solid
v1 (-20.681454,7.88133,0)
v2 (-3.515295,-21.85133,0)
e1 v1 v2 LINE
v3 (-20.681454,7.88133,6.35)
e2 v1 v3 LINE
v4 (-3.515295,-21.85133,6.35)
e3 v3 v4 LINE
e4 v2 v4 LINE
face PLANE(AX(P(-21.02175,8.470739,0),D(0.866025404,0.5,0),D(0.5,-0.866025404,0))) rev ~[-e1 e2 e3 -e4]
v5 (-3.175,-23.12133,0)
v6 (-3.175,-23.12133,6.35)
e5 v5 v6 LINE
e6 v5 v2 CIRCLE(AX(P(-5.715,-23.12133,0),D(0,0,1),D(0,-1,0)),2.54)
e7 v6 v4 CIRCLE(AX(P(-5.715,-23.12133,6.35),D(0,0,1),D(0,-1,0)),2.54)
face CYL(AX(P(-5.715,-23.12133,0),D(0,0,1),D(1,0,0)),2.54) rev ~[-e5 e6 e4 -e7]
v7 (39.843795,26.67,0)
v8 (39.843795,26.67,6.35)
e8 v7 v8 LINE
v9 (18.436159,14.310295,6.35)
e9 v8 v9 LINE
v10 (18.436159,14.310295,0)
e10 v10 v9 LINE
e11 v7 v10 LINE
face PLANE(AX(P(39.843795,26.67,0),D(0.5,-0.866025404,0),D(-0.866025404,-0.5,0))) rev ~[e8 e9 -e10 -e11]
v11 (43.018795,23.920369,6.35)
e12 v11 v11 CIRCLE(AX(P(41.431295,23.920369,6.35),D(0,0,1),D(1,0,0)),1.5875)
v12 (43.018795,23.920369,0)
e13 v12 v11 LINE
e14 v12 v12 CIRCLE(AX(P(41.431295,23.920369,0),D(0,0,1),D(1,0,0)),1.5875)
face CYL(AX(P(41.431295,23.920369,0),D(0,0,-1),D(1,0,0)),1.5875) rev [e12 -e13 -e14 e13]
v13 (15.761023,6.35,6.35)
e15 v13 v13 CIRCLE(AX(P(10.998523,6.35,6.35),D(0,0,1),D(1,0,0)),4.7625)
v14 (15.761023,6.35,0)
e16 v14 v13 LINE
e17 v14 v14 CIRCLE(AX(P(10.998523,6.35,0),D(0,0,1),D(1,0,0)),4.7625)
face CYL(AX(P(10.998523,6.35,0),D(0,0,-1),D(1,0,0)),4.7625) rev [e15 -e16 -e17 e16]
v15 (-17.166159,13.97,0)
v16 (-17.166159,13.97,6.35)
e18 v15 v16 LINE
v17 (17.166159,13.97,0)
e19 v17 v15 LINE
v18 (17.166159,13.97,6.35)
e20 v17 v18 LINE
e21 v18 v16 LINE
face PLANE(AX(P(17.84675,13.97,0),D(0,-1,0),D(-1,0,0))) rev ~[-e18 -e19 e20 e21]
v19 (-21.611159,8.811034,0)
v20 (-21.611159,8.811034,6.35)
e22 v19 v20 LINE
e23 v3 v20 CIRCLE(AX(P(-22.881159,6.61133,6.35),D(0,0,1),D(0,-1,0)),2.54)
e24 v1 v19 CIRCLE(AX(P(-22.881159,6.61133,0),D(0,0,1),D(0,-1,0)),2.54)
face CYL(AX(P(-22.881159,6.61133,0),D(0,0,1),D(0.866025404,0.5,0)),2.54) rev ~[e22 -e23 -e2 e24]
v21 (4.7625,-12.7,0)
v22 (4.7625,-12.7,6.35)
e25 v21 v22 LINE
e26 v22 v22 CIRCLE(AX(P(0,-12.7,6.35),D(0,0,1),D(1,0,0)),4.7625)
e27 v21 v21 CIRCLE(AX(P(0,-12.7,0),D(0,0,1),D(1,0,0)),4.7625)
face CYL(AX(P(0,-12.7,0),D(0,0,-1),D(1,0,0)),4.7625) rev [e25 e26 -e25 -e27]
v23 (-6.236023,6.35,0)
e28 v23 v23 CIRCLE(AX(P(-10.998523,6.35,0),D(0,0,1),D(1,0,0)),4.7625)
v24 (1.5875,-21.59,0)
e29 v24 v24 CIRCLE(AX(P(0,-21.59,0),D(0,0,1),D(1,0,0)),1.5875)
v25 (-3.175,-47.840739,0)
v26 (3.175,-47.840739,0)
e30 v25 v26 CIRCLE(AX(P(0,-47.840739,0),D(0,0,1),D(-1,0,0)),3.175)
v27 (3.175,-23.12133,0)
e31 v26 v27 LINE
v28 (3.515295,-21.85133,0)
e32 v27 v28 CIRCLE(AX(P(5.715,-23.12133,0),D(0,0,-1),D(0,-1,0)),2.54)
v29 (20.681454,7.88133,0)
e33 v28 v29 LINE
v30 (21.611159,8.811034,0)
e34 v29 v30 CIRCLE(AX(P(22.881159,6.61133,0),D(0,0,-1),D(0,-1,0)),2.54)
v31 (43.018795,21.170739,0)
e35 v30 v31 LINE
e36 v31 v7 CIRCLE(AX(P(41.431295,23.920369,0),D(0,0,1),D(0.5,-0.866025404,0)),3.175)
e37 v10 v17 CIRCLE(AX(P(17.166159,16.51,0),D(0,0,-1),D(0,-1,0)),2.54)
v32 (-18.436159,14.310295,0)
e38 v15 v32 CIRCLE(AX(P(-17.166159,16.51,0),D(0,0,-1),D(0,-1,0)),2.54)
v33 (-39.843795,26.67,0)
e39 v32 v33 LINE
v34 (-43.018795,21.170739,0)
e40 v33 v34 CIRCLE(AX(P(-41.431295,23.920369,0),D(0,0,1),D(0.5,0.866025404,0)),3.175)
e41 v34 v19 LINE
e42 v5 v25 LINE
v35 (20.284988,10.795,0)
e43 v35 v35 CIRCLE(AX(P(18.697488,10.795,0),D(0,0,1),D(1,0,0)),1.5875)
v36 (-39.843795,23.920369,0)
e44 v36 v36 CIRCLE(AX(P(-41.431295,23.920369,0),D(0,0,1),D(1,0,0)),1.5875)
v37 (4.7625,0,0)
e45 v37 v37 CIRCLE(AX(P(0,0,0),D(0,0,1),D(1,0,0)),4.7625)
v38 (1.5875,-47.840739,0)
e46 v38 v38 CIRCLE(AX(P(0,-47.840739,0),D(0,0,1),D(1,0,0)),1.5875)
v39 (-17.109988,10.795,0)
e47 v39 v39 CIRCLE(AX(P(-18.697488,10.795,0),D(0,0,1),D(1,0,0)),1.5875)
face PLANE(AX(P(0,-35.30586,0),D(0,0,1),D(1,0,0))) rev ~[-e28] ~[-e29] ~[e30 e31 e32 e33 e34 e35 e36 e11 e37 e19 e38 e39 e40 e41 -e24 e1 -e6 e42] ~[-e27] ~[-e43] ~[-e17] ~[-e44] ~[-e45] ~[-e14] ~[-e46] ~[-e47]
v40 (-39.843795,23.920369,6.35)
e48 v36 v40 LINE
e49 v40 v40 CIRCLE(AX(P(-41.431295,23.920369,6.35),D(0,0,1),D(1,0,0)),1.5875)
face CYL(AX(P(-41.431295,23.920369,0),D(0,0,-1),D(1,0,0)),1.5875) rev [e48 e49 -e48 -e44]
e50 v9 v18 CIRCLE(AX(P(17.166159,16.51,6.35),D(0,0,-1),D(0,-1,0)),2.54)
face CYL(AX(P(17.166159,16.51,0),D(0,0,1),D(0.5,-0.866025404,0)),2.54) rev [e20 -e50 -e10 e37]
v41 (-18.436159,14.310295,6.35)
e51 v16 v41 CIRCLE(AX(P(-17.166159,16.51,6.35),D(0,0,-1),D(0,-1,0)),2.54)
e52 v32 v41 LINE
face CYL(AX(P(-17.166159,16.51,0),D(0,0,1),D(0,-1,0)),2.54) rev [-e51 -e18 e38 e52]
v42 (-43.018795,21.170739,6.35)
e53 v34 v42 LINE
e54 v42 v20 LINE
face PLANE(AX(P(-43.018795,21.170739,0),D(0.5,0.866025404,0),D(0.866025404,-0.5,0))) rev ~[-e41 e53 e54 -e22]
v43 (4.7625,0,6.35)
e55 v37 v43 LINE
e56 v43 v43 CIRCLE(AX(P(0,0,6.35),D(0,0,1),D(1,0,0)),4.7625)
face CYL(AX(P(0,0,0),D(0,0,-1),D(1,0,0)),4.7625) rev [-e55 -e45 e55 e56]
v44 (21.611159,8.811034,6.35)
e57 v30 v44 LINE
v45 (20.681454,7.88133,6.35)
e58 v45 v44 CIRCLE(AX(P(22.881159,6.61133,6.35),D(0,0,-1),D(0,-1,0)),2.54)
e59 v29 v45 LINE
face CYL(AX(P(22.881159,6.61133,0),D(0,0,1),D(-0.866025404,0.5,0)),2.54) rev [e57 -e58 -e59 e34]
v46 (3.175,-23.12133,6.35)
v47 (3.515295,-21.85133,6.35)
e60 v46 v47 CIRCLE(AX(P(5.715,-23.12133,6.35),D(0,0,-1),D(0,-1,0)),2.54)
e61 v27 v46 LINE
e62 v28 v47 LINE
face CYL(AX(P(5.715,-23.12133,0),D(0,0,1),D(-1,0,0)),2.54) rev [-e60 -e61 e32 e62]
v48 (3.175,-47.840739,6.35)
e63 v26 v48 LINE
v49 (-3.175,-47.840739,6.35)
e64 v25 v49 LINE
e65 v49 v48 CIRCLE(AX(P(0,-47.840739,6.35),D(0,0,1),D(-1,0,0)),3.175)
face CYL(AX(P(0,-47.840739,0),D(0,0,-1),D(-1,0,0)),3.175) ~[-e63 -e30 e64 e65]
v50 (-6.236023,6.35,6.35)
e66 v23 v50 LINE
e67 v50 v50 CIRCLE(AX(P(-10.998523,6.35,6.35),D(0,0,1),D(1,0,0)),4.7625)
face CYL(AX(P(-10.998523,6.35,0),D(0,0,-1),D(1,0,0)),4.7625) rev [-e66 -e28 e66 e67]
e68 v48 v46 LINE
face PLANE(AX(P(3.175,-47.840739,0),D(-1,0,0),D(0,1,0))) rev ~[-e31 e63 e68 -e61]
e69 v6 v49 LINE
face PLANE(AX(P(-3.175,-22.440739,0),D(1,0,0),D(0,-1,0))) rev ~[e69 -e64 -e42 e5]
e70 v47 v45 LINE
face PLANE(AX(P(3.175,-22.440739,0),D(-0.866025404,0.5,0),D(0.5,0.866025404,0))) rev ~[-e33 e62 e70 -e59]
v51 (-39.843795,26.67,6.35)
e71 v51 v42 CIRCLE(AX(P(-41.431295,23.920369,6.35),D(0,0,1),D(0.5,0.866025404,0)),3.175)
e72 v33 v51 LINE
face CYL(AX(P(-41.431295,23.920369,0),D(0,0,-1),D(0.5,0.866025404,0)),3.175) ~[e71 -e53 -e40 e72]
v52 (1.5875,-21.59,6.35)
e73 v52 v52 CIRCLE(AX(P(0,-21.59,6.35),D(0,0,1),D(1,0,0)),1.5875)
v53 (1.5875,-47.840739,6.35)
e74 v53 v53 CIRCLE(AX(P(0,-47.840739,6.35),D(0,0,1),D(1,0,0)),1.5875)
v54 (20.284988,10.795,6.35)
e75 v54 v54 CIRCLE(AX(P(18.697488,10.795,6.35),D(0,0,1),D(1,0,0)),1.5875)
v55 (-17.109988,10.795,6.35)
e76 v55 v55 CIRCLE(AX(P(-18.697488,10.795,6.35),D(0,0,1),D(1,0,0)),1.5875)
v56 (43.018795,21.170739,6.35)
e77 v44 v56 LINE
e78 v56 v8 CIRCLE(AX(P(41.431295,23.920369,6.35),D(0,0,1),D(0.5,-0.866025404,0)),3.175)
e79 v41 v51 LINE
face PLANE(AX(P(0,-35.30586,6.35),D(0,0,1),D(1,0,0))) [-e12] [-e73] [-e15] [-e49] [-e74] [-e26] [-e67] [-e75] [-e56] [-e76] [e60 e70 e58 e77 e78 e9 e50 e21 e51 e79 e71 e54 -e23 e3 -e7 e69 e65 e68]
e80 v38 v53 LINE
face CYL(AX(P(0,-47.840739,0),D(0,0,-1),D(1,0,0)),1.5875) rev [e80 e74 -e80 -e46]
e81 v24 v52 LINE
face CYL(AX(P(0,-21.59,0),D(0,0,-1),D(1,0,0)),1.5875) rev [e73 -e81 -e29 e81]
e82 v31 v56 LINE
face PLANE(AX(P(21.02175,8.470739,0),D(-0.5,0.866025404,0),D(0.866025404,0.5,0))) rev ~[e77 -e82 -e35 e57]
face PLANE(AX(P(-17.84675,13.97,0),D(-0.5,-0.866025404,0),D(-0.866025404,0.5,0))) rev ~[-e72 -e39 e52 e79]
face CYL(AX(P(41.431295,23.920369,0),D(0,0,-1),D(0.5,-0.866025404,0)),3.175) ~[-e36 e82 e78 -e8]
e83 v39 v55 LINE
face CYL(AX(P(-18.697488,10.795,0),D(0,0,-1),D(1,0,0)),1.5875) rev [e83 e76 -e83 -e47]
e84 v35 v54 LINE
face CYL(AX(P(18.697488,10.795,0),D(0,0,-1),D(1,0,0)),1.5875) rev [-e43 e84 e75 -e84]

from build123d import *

# Parameters (mm, degrees)
F0_R     = 1.5875
F0_R_2   = 4.7625
F1_DEPTH = 6.35
F2_R     = 2.54


# Not quite as in the source:
# - a length typed as a fraction of an inch, garbled in the dataset ("3 / 203.2 mm" for 3/8 in), is restored


with BuildPart() as f1:
    # F0 (on Top) → F1 (new body)
    with BuildSketch(Plane.XY):
        with BuildLine():
            Line((3.175, -22.440738686), (0, -27.94))
            Line((0, -27.94), (-3.175, -22.440738686))
            Line((-3.175, -22.440738686), (-3.175, -47.840738686))
            ThreePointArc((-3.175, -47.840738686), (0, -51.015738686), (3.175, -47.840738686))
            Line((3.175, -47.840738686), (3.175, -22.440738686))
        make_face()
        with Locations((0, -47.840738686)):
            Circle(F0_R, mode=Mode.SUBTRACT)
        Polygon((-3.175, -22.440738686), (0, -27.94), (3.175, -22.440738686), (21.0217497817, 8.470738686), (24.1967497817, 13.97), (17.8467497817, 13.97), (-17.8467497817, 13.97), (-24.1967497817, 13.97), (-21.0217497817, 8.470738686), align=None)
        with Locations((0, -21.59)):
            Circle(F0_R, mode=Mode.SUBTRACT)
        with Locations((0, -12.7)):
            Circle(F0_R_2, mode=Mode.SUBTRACT)
        Circle(F0_R_2, mode=Mode.SUBTRACT)
        with Locations((-10.9985226281, 6.35)):
            Circle(F0_R_2, mode=Mode.SUBTRACT)
        with Locations((-18.6974884677, 10.795)):
            Circle(F0_R, mode=Mode.SUBTRACT)
        with Locations((10.9985226281, 6.35)):
            Circle(F0_R_2, mode=Mode.SUBTRACT)
        with Locations((18.6974884677, 10.795)):
            Circle(F0_R, mode=Mode.SUBTRACT)
        with BuildLine():
            Line((-43.0187950379, 21.170738686), (-21.0217497817, 8.470738686))
            Line((-21.0217497817, 8.470738686), (-24.1967497817, 13.97))
            Line((-24.1967497817, 13.97), (-17.8467497817, 13.97))
            Line((-17.8467497817, 13.97), (-39.8437950379, 26.67))
            ThreePointArc((-39.8437950379, 26.67), (-44.1809256949, 25.507869343), (-43.0187950379, 21.170738686))
        make_face()
        with Locations((-41.4312950379, 23.920369343)):
            Circle(F0_R, mode=Mode.SUBTRACT)
        with BuildLine():
            Line((24.1967497817, 13.97), (21.0217497817, 8.470738686))
            Line((21.0217497817, 8.470738686), (43.0187950379, 21.170738686))
            ThreePointArc((43.0187950379, 21.170738686), (44.1809256949, 25.507869343), (39.8437950379, 26.67))
            Line((39.8437950379, 26.67), (17.8467497817, 13.97))
            Line((17.8467497817, 13.97), (24.1967497817, 13.97))
        make_face()
        with Locations((41.4312950379, 23.920369343)):
            Circle(F0_R, mode=Mode.SUBTRACT)
    extrude(amount=F1_DEPTH)

    # F2
    f2_edges = [f1.edges().sort_by_distance(p)[0] for p in [
        (-3.175, -22.440739, 3.175),
        (-21.02175, 8.470739, 3.175),
        (-17.84675, 13.97, 3.175),
        (17.84675, 13.97, 3.175),
        (21.02175, 8.470739, 3.175),
        (3.175, -22.440739, 3.175),
    ]]
    fillet(f2_edges, radius=F2_R)


solid = f1.part
